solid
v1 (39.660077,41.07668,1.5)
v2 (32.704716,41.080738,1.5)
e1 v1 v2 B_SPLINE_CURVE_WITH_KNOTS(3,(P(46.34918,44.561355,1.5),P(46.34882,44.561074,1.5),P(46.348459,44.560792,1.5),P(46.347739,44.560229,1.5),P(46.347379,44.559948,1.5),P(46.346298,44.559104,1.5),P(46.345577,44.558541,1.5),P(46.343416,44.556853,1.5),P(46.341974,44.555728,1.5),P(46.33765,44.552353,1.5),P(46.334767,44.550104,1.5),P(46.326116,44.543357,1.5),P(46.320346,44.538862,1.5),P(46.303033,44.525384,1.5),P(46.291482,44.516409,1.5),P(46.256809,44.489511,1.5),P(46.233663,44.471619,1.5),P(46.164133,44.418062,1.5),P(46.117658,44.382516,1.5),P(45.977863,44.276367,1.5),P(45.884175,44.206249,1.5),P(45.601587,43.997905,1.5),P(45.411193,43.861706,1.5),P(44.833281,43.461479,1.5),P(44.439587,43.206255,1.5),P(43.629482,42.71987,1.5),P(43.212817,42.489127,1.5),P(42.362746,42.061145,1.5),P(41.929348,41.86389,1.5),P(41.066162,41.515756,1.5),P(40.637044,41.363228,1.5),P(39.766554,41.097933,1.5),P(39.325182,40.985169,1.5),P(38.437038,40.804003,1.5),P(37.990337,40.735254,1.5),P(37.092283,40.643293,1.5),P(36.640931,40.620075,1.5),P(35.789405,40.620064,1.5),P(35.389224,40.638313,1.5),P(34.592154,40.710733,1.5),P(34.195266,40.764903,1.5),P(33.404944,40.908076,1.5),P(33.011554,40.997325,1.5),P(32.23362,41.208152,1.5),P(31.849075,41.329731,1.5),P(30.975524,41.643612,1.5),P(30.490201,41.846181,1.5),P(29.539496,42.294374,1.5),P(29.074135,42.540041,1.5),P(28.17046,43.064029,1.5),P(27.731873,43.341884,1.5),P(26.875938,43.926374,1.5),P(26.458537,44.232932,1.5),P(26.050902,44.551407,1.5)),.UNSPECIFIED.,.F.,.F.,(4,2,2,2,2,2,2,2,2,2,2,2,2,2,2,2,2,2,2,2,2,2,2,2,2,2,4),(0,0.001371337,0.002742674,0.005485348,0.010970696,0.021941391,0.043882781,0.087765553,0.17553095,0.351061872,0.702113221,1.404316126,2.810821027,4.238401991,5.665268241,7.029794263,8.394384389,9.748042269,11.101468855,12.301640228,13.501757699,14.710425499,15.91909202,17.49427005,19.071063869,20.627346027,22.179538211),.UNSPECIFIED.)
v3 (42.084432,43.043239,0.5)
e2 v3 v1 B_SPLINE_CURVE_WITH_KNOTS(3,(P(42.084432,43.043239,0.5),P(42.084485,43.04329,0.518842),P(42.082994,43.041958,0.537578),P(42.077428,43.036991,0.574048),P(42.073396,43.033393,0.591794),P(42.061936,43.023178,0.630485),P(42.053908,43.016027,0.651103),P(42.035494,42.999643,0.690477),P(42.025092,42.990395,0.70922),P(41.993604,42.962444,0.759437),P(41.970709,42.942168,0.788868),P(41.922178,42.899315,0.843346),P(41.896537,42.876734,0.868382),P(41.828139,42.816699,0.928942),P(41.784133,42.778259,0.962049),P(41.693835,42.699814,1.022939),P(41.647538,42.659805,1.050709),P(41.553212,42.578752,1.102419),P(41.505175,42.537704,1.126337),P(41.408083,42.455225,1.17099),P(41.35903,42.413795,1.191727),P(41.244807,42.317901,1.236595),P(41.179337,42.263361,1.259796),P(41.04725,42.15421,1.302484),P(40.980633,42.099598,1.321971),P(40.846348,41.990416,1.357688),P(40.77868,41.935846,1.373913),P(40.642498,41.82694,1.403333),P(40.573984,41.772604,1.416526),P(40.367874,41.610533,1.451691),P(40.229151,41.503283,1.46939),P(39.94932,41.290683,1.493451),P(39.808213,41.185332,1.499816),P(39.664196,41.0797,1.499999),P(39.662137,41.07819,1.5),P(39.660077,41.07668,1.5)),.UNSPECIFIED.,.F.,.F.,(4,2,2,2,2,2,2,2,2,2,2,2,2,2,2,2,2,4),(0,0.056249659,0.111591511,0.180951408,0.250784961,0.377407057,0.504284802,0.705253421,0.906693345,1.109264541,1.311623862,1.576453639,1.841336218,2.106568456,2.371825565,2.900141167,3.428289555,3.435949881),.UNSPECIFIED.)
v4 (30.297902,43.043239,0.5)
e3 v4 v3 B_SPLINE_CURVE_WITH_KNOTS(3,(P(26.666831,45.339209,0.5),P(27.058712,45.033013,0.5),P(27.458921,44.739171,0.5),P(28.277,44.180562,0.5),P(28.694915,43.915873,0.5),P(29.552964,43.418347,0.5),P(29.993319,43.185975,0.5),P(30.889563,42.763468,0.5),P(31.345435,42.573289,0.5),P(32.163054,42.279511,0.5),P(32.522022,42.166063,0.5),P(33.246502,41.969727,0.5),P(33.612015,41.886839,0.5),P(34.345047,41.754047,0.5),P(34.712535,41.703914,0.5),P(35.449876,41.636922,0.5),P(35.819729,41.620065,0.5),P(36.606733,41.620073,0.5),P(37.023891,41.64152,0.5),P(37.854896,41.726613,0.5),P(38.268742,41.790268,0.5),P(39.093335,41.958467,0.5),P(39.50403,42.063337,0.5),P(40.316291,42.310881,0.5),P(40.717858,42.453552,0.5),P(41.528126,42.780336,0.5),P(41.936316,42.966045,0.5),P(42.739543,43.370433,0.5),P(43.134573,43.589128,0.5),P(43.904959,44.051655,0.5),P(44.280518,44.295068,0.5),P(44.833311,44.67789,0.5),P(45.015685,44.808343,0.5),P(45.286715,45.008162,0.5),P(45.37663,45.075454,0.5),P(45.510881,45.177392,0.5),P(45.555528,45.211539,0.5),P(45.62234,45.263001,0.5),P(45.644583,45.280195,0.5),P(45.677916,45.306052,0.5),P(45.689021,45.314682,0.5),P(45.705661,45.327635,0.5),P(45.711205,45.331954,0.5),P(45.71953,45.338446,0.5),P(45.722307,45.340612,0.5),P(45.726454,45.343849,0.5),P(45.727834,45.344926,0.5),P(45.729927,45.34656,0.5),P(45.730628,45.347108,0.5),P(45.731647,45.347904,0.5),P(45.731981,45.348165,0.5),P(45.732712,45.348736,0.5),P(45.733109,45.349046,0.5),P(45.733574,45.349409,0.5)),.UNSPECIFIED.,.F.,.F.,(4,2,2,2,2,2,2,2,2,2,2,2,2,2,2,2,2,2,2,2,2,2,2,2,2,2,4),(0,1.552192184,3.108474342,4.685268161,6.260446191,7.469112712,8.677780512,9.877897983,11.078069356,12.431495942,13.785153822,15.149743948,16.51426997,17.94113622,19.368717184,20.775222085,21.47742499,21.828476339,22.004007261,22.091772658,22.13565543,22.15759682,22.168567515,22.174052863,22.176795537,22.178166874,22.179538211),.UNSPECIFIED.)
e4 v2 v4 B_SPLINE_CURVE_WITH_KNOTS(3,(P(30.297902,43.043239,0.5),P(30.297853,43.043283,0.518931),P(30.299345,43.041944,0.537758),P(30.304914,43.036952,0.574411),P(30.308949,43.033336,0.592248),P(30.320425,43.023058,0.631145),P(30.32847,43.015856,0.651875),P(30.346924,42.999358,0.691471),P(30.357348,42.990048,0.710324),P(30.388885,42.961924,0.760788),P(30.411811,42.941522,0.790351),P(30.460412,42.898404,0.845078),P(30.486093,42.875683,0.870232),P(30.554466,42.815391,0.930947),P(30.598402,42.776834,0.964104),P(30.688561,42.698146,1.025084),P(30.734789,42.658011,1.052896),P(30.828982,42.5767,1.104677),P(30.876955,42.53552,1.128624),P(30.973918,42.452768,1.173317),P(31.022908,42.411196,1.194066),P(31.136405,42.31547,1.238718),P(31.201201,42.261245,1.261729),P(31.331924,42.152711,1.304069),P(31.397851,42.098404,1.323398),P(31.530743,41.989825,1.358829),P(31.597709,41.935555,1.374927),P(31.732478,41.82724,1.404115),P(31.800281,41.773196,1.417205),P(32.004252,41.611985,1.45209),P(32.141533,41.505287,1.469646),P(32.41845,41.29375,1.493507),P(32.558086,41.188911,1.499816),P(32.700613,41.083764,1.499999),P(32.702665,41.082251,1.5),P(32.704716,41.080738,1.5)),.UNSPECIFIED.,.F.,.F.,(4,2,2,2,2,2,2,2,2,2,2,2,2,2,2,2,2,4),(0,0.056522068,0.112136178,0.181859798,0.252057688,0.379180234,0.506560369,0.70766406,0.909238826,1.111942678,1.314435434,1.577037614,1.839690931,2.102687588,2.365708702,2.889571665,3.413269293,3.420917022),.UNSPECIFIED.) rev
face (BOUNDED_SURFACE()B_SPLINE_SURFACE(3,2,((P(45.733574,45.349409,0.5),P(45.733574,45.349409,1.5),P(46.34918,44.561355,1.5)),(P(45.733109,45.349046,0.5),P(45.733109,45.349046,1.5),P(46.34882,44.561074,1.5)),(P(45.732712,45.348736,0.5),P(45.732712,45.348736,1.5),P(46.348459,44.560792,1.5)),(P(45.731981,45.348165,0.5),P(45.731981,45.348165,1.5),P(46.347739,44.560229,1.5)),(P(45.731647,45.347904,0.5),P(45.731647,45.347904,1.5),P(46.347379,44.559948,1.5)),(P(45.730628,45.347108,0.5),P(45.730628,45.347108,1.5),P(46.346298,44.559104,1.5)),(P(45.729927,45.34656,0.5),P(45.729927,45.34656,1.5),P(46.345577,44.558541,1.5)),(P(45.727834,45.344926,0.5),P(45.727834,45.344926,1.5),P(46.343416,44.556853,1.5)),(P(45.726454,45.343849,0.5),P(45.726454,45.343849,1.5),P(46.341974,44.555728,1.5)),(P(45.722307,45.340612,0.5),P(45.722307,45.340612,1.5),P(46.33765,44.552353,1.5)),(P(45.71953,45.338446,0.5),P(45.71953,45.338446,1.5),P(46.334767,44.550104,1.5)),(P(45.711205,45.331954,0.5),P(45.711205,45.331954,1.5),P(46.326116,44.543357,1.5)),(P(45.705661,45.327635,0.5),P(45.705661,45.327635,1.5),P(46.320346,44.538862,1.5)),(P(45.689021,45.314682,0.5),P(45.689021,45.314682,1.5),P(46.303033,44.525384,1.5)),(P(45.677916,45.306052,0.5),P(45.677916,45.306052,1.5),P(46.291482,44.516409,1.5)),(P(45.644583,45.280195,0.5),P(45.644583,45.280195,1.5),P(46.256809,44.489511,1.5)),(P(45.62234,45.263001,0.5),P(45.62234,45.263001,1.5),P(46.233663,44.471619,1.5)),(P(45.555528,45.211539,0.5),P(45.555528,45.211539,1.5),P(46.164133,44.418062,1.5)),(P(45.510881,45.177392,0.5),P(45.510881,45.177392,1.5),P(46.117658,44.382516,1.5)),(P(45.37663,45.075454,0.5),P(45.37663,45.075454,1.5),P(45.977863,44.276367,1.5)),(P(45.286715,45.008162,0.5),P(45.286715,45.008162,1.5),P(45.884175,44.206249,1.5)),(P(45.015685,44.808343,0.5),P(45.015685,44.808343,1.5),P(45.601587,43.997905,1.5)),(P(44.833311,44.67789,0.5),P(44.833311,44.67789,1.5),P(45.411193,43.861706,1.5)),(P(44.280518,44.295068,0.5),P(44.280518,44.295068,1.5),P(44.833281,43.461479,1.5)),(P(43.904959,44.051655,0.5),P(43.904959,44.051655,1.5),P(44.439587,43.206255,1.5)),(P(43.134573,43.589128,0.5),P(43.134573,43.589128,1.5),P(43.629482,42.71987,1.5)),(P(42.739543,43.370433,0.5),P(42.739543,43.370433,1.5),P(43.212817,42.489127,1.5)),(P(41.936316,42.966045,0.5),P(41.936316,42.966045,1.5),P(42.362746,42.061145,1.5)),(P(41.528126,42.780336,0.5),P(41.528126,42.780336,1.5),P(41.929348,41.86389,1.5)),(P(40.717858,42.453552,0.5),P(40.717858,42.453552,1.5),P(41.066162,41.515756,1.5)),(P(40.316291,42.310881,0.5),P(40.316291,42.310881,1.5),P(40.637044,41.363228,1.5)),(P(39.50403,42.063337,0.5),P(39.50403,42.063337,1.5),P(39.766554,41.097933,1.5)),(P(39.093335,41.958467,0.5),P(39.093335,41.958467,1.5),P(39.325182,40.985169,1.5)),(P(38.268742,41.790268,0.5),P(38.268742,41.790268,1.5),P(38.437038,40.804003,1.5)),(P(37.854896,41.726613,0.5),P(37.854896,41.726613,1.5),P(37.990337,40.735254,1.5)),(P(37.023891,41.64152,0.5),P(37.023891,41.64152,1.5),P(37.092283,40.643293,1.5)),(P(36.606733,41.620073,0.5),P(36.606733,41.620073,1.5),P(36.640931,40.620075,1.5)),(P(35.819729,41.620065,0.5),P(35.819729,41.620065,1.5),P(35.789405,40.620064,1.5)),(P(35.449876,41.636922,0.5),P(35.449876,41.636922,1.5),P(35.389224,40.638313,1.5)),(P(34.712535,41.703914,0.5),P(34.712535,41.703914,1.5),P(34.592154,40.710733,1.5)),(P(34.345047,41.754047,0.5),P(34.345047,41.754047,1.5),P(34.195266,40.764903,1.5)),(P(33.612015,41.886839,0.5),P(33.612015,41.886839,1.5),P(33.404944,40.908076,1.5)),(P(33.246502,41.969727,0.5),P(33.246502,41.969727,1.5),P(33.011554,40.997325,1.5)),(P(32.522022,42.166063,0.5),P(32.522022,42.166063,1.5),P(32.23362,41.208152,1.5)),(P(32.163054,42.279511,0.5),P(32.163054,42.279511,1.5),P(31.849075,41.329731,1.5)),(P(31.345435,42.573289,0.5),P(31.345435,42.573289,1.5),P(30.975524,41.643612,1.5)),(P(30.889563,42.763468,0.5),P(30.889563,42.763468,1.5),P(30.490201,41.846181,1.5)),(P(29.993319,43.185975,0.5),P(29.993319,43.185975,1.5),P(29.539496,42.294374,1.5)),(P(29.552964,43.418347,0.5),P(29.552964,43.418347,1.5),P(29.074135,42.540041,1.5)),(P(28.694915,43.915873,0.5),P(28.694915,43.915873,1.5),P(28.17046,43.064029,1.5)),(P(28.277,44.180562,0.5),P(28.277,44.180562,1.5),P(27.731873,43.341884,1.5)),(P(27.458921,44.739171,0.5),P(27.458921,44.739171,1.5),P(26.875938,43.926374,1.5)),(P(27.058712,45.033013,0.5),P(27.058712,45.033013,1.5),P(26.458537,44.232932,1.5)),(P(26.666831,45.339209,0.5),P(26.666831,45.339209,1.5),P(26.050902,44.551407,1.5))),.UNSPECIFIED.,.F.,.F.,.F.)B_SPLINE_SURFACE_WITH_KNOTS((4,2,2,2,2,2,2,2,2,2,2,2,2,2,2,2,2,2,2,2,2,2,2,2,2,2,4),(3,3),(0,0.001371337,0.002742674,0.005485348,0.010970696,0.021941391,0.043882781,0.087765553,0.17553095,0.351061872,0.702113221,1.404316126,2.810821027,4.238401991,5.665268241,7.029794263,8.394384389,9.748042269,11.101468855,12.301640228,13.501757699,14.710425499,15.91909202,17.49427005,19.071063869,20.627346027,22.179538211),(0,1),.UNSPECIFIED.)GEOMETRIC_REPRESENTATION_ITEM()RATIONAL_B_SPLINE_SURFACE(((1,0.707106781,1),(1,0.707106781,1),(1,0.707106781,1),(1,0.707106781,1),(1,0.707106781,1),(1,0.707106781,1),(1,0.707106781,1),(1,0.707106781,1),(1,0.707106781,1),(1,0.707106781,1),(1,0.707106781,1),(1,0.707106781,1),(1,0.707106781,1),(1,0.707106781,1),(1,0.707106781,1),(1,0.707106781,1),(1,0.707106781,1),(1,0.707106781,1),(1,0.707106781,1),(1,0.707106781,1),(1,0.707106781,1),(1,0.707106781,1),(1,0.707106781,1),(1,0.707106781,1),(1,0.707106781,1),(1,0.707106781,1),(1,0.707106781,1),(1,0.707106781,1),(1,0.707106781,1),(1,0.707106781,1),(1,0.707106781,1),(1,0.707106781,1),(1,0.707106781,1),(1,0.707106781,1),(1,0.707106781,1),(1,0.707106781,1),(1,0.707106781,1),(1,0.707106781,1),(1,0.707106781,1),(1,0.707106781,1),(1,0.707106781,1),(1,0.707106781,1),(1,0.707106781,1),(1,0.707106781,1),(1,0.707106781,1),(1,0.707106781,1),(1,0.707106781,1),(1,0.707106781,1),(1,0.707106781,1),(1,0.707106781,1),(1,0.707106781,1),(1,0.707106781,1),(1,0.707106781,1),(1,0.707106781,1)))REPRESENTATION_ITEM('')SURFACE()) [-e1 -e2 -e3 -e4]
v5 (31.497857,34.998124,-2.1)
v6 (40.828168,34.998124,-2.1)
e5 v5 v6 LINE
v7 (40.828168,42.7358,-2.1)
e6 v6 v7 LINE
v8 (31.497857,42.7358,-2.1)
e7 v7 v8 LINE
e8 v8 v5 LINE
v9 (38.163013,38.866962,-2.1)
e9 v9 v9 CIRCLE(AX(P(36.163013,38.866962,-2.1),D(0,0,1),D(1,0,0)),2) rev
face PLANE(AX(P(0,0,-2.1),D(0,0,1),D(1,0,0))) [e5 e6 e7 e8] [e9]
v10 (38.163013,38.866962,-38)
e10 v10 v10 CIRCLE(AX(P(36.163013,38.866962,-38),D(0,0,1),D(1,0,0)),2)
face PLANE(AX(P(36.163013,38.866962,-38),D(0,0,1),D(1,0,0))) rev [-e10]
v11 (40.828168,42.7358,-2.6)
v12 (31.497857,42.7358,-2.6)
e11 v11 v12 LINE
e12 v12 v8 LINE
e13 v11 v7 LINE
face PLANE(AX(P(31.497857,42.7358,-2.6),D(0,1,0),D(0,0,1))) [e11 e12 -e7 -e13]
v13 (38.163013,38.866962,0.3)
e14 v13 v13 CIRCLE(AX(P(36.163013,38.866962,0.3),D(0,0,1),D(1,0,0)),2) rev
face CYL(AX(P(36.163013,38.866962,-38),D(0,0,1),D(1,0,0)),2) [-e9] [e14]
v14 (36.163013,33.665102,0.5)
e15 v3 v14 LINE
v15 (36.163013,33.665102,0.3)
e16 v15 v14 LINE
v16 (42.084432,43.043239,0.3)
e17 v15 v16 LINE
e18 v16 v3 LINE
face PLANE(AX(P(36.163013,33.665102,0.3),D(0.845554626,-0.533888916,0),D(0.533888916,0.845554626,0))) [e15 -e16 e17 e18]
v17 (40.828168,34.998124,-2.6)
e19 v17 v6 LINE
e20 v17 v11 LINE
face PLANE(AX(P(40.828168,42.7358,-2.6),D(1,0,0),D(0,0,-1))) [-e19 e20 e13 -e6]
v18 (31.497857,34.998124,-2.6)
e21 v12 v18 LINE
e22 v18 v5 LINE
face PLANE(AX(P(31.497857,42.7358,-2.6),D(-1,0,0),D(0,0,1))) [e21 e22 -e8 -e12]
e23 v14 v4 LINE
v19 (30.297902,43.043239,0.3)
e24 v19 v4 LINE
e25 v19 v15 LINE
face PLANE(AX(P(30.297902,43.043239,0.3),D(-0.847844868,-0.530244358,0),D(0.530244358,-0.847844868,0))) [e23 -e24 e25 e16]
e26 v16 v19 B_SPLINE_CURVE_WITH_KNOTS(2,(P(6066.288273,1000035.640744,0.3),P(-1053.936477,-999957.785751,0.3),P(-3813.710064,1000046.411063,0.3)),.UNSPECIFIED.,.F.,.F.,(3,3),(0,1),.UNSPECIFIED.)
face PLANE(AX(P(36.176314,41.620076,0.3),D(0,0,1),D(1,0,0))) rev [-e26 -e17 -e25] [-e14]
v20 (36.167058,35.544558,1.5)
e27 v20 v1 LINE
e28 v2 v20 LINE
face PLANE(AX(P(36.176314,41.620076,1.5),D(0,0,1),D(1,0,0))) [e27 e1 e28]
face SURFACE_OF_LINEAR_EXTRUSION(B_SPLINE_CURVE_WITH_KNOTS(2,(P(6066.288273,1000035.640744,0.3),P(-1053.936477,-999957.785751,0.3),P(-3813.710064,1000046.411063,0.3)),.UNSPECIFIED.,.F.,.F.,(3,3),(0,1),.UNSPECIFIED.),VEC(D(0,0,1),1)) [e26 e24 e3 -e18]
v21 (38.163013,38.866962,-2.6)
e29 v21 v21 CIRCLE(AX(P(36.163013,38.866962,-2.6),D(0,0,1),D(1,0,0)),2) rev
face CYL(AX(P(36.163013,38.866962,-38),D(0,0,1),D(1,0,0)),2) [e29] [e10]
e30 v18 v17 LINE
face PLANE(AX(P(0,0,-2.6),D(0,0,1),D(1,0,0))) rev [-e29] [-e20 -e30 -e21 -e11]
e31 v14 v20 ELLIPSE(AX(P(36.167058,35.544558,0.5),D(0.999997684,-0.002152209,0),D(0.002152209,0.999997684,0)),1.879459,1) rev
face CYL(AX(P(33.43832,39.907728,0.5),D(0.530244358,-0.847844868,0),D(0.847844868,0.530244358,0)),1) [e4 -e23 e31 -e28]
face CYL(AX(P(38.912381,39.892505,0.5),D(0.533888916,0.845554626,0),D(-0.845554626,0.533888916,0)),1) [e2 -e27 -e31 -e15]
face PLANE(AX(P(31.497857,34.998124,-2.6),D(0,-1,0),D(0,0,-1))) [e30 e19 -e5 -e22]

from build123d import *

# Parameters (mm, degrees)
BOSS_EXTRUDE1_DEPTH      = 0.5
BOSS_EXTRUDE1_DEPTH_BACK = 38
SKETCH1_R                = 2
BOSS_EXTRUDE2_DEPTH      = 1
BOSS_EXTRUDE2_DEPTH_BACK = 0.2
FILLET1_R                = 1
SKETCH3_W                = 9.33031097
SKETCH3_H                = 7.737675748
BOSS_EXTRUDE3_DEPTH      = 0.5


with BuildPart() as part:
    # Sketch1 → Boss-Extrude1 (new, two sides: drawn at the far end of the back side and taken through both)
    with BuildSketch(Plane.XY.offset(-BOSS_EXTRUDE1_DEPTH_BACK)):
        with Locations((36.163012657, 38.866961635)):
            Circle(SKETCH1_R)
    extrude(amount=BOSS_EXTRUDE1_DEPTH + BOSS_EXTRUDE1_DEPTH_BACK)

    # Sketch2 → Boss-Extrude2 (add, two sides: drawn at the far end of the back side and taken through both)
    with BuildSketch(Plane.XY.offset(0.5).offset(-BOSS_EXTRUDE2_DEPTH_BACK)):
        with BuildLine():
            Line((36.163012657, 33.665102482), (42.084431795, 43.04323939))
            add(Edge.make_bspline(
                [(42.084431795, 43.04323939), (36.188063939, 40.196898594), (30.297901751, 43.04323939)],
                knots=[0, 0, 0, 1, 1, 1], degree=2))
            Line((30.297901751, 43.04323939), (36.163012657, 33.665102482))
        make_face()
    extrude(amount=BOSS_EXTRUDE2_DEPTH + BOSS_EXTRUDE2_DEPTH_BACK)

    # Fillet1
    fillet1_edges = [part.edges().sort_by_distance(p)[0] for p in [
        (33.230457204, 38.354170936, 1.5),
        (39.123722226, 38.354170936, 1.5),
        (36.189615356, 41.620068992, 1.5),
    ]]
    fillet(fillet1_edges, radius=FILLET1_R - 0.0001)  # a hair under: the kernel refuses the full size

    # Sketch3 → Boss-Extrude3 (add)
    with BuildSketch(Plane.XY.offset(-2.1)):
        with Locations((36.163012657, 38.866961635)):
            Rectangle(SKETCH3_W, SKETCH3_H)
    extrude(amount=-BOSS_EXTRUDE3_DEPTH)


solid = part.part
